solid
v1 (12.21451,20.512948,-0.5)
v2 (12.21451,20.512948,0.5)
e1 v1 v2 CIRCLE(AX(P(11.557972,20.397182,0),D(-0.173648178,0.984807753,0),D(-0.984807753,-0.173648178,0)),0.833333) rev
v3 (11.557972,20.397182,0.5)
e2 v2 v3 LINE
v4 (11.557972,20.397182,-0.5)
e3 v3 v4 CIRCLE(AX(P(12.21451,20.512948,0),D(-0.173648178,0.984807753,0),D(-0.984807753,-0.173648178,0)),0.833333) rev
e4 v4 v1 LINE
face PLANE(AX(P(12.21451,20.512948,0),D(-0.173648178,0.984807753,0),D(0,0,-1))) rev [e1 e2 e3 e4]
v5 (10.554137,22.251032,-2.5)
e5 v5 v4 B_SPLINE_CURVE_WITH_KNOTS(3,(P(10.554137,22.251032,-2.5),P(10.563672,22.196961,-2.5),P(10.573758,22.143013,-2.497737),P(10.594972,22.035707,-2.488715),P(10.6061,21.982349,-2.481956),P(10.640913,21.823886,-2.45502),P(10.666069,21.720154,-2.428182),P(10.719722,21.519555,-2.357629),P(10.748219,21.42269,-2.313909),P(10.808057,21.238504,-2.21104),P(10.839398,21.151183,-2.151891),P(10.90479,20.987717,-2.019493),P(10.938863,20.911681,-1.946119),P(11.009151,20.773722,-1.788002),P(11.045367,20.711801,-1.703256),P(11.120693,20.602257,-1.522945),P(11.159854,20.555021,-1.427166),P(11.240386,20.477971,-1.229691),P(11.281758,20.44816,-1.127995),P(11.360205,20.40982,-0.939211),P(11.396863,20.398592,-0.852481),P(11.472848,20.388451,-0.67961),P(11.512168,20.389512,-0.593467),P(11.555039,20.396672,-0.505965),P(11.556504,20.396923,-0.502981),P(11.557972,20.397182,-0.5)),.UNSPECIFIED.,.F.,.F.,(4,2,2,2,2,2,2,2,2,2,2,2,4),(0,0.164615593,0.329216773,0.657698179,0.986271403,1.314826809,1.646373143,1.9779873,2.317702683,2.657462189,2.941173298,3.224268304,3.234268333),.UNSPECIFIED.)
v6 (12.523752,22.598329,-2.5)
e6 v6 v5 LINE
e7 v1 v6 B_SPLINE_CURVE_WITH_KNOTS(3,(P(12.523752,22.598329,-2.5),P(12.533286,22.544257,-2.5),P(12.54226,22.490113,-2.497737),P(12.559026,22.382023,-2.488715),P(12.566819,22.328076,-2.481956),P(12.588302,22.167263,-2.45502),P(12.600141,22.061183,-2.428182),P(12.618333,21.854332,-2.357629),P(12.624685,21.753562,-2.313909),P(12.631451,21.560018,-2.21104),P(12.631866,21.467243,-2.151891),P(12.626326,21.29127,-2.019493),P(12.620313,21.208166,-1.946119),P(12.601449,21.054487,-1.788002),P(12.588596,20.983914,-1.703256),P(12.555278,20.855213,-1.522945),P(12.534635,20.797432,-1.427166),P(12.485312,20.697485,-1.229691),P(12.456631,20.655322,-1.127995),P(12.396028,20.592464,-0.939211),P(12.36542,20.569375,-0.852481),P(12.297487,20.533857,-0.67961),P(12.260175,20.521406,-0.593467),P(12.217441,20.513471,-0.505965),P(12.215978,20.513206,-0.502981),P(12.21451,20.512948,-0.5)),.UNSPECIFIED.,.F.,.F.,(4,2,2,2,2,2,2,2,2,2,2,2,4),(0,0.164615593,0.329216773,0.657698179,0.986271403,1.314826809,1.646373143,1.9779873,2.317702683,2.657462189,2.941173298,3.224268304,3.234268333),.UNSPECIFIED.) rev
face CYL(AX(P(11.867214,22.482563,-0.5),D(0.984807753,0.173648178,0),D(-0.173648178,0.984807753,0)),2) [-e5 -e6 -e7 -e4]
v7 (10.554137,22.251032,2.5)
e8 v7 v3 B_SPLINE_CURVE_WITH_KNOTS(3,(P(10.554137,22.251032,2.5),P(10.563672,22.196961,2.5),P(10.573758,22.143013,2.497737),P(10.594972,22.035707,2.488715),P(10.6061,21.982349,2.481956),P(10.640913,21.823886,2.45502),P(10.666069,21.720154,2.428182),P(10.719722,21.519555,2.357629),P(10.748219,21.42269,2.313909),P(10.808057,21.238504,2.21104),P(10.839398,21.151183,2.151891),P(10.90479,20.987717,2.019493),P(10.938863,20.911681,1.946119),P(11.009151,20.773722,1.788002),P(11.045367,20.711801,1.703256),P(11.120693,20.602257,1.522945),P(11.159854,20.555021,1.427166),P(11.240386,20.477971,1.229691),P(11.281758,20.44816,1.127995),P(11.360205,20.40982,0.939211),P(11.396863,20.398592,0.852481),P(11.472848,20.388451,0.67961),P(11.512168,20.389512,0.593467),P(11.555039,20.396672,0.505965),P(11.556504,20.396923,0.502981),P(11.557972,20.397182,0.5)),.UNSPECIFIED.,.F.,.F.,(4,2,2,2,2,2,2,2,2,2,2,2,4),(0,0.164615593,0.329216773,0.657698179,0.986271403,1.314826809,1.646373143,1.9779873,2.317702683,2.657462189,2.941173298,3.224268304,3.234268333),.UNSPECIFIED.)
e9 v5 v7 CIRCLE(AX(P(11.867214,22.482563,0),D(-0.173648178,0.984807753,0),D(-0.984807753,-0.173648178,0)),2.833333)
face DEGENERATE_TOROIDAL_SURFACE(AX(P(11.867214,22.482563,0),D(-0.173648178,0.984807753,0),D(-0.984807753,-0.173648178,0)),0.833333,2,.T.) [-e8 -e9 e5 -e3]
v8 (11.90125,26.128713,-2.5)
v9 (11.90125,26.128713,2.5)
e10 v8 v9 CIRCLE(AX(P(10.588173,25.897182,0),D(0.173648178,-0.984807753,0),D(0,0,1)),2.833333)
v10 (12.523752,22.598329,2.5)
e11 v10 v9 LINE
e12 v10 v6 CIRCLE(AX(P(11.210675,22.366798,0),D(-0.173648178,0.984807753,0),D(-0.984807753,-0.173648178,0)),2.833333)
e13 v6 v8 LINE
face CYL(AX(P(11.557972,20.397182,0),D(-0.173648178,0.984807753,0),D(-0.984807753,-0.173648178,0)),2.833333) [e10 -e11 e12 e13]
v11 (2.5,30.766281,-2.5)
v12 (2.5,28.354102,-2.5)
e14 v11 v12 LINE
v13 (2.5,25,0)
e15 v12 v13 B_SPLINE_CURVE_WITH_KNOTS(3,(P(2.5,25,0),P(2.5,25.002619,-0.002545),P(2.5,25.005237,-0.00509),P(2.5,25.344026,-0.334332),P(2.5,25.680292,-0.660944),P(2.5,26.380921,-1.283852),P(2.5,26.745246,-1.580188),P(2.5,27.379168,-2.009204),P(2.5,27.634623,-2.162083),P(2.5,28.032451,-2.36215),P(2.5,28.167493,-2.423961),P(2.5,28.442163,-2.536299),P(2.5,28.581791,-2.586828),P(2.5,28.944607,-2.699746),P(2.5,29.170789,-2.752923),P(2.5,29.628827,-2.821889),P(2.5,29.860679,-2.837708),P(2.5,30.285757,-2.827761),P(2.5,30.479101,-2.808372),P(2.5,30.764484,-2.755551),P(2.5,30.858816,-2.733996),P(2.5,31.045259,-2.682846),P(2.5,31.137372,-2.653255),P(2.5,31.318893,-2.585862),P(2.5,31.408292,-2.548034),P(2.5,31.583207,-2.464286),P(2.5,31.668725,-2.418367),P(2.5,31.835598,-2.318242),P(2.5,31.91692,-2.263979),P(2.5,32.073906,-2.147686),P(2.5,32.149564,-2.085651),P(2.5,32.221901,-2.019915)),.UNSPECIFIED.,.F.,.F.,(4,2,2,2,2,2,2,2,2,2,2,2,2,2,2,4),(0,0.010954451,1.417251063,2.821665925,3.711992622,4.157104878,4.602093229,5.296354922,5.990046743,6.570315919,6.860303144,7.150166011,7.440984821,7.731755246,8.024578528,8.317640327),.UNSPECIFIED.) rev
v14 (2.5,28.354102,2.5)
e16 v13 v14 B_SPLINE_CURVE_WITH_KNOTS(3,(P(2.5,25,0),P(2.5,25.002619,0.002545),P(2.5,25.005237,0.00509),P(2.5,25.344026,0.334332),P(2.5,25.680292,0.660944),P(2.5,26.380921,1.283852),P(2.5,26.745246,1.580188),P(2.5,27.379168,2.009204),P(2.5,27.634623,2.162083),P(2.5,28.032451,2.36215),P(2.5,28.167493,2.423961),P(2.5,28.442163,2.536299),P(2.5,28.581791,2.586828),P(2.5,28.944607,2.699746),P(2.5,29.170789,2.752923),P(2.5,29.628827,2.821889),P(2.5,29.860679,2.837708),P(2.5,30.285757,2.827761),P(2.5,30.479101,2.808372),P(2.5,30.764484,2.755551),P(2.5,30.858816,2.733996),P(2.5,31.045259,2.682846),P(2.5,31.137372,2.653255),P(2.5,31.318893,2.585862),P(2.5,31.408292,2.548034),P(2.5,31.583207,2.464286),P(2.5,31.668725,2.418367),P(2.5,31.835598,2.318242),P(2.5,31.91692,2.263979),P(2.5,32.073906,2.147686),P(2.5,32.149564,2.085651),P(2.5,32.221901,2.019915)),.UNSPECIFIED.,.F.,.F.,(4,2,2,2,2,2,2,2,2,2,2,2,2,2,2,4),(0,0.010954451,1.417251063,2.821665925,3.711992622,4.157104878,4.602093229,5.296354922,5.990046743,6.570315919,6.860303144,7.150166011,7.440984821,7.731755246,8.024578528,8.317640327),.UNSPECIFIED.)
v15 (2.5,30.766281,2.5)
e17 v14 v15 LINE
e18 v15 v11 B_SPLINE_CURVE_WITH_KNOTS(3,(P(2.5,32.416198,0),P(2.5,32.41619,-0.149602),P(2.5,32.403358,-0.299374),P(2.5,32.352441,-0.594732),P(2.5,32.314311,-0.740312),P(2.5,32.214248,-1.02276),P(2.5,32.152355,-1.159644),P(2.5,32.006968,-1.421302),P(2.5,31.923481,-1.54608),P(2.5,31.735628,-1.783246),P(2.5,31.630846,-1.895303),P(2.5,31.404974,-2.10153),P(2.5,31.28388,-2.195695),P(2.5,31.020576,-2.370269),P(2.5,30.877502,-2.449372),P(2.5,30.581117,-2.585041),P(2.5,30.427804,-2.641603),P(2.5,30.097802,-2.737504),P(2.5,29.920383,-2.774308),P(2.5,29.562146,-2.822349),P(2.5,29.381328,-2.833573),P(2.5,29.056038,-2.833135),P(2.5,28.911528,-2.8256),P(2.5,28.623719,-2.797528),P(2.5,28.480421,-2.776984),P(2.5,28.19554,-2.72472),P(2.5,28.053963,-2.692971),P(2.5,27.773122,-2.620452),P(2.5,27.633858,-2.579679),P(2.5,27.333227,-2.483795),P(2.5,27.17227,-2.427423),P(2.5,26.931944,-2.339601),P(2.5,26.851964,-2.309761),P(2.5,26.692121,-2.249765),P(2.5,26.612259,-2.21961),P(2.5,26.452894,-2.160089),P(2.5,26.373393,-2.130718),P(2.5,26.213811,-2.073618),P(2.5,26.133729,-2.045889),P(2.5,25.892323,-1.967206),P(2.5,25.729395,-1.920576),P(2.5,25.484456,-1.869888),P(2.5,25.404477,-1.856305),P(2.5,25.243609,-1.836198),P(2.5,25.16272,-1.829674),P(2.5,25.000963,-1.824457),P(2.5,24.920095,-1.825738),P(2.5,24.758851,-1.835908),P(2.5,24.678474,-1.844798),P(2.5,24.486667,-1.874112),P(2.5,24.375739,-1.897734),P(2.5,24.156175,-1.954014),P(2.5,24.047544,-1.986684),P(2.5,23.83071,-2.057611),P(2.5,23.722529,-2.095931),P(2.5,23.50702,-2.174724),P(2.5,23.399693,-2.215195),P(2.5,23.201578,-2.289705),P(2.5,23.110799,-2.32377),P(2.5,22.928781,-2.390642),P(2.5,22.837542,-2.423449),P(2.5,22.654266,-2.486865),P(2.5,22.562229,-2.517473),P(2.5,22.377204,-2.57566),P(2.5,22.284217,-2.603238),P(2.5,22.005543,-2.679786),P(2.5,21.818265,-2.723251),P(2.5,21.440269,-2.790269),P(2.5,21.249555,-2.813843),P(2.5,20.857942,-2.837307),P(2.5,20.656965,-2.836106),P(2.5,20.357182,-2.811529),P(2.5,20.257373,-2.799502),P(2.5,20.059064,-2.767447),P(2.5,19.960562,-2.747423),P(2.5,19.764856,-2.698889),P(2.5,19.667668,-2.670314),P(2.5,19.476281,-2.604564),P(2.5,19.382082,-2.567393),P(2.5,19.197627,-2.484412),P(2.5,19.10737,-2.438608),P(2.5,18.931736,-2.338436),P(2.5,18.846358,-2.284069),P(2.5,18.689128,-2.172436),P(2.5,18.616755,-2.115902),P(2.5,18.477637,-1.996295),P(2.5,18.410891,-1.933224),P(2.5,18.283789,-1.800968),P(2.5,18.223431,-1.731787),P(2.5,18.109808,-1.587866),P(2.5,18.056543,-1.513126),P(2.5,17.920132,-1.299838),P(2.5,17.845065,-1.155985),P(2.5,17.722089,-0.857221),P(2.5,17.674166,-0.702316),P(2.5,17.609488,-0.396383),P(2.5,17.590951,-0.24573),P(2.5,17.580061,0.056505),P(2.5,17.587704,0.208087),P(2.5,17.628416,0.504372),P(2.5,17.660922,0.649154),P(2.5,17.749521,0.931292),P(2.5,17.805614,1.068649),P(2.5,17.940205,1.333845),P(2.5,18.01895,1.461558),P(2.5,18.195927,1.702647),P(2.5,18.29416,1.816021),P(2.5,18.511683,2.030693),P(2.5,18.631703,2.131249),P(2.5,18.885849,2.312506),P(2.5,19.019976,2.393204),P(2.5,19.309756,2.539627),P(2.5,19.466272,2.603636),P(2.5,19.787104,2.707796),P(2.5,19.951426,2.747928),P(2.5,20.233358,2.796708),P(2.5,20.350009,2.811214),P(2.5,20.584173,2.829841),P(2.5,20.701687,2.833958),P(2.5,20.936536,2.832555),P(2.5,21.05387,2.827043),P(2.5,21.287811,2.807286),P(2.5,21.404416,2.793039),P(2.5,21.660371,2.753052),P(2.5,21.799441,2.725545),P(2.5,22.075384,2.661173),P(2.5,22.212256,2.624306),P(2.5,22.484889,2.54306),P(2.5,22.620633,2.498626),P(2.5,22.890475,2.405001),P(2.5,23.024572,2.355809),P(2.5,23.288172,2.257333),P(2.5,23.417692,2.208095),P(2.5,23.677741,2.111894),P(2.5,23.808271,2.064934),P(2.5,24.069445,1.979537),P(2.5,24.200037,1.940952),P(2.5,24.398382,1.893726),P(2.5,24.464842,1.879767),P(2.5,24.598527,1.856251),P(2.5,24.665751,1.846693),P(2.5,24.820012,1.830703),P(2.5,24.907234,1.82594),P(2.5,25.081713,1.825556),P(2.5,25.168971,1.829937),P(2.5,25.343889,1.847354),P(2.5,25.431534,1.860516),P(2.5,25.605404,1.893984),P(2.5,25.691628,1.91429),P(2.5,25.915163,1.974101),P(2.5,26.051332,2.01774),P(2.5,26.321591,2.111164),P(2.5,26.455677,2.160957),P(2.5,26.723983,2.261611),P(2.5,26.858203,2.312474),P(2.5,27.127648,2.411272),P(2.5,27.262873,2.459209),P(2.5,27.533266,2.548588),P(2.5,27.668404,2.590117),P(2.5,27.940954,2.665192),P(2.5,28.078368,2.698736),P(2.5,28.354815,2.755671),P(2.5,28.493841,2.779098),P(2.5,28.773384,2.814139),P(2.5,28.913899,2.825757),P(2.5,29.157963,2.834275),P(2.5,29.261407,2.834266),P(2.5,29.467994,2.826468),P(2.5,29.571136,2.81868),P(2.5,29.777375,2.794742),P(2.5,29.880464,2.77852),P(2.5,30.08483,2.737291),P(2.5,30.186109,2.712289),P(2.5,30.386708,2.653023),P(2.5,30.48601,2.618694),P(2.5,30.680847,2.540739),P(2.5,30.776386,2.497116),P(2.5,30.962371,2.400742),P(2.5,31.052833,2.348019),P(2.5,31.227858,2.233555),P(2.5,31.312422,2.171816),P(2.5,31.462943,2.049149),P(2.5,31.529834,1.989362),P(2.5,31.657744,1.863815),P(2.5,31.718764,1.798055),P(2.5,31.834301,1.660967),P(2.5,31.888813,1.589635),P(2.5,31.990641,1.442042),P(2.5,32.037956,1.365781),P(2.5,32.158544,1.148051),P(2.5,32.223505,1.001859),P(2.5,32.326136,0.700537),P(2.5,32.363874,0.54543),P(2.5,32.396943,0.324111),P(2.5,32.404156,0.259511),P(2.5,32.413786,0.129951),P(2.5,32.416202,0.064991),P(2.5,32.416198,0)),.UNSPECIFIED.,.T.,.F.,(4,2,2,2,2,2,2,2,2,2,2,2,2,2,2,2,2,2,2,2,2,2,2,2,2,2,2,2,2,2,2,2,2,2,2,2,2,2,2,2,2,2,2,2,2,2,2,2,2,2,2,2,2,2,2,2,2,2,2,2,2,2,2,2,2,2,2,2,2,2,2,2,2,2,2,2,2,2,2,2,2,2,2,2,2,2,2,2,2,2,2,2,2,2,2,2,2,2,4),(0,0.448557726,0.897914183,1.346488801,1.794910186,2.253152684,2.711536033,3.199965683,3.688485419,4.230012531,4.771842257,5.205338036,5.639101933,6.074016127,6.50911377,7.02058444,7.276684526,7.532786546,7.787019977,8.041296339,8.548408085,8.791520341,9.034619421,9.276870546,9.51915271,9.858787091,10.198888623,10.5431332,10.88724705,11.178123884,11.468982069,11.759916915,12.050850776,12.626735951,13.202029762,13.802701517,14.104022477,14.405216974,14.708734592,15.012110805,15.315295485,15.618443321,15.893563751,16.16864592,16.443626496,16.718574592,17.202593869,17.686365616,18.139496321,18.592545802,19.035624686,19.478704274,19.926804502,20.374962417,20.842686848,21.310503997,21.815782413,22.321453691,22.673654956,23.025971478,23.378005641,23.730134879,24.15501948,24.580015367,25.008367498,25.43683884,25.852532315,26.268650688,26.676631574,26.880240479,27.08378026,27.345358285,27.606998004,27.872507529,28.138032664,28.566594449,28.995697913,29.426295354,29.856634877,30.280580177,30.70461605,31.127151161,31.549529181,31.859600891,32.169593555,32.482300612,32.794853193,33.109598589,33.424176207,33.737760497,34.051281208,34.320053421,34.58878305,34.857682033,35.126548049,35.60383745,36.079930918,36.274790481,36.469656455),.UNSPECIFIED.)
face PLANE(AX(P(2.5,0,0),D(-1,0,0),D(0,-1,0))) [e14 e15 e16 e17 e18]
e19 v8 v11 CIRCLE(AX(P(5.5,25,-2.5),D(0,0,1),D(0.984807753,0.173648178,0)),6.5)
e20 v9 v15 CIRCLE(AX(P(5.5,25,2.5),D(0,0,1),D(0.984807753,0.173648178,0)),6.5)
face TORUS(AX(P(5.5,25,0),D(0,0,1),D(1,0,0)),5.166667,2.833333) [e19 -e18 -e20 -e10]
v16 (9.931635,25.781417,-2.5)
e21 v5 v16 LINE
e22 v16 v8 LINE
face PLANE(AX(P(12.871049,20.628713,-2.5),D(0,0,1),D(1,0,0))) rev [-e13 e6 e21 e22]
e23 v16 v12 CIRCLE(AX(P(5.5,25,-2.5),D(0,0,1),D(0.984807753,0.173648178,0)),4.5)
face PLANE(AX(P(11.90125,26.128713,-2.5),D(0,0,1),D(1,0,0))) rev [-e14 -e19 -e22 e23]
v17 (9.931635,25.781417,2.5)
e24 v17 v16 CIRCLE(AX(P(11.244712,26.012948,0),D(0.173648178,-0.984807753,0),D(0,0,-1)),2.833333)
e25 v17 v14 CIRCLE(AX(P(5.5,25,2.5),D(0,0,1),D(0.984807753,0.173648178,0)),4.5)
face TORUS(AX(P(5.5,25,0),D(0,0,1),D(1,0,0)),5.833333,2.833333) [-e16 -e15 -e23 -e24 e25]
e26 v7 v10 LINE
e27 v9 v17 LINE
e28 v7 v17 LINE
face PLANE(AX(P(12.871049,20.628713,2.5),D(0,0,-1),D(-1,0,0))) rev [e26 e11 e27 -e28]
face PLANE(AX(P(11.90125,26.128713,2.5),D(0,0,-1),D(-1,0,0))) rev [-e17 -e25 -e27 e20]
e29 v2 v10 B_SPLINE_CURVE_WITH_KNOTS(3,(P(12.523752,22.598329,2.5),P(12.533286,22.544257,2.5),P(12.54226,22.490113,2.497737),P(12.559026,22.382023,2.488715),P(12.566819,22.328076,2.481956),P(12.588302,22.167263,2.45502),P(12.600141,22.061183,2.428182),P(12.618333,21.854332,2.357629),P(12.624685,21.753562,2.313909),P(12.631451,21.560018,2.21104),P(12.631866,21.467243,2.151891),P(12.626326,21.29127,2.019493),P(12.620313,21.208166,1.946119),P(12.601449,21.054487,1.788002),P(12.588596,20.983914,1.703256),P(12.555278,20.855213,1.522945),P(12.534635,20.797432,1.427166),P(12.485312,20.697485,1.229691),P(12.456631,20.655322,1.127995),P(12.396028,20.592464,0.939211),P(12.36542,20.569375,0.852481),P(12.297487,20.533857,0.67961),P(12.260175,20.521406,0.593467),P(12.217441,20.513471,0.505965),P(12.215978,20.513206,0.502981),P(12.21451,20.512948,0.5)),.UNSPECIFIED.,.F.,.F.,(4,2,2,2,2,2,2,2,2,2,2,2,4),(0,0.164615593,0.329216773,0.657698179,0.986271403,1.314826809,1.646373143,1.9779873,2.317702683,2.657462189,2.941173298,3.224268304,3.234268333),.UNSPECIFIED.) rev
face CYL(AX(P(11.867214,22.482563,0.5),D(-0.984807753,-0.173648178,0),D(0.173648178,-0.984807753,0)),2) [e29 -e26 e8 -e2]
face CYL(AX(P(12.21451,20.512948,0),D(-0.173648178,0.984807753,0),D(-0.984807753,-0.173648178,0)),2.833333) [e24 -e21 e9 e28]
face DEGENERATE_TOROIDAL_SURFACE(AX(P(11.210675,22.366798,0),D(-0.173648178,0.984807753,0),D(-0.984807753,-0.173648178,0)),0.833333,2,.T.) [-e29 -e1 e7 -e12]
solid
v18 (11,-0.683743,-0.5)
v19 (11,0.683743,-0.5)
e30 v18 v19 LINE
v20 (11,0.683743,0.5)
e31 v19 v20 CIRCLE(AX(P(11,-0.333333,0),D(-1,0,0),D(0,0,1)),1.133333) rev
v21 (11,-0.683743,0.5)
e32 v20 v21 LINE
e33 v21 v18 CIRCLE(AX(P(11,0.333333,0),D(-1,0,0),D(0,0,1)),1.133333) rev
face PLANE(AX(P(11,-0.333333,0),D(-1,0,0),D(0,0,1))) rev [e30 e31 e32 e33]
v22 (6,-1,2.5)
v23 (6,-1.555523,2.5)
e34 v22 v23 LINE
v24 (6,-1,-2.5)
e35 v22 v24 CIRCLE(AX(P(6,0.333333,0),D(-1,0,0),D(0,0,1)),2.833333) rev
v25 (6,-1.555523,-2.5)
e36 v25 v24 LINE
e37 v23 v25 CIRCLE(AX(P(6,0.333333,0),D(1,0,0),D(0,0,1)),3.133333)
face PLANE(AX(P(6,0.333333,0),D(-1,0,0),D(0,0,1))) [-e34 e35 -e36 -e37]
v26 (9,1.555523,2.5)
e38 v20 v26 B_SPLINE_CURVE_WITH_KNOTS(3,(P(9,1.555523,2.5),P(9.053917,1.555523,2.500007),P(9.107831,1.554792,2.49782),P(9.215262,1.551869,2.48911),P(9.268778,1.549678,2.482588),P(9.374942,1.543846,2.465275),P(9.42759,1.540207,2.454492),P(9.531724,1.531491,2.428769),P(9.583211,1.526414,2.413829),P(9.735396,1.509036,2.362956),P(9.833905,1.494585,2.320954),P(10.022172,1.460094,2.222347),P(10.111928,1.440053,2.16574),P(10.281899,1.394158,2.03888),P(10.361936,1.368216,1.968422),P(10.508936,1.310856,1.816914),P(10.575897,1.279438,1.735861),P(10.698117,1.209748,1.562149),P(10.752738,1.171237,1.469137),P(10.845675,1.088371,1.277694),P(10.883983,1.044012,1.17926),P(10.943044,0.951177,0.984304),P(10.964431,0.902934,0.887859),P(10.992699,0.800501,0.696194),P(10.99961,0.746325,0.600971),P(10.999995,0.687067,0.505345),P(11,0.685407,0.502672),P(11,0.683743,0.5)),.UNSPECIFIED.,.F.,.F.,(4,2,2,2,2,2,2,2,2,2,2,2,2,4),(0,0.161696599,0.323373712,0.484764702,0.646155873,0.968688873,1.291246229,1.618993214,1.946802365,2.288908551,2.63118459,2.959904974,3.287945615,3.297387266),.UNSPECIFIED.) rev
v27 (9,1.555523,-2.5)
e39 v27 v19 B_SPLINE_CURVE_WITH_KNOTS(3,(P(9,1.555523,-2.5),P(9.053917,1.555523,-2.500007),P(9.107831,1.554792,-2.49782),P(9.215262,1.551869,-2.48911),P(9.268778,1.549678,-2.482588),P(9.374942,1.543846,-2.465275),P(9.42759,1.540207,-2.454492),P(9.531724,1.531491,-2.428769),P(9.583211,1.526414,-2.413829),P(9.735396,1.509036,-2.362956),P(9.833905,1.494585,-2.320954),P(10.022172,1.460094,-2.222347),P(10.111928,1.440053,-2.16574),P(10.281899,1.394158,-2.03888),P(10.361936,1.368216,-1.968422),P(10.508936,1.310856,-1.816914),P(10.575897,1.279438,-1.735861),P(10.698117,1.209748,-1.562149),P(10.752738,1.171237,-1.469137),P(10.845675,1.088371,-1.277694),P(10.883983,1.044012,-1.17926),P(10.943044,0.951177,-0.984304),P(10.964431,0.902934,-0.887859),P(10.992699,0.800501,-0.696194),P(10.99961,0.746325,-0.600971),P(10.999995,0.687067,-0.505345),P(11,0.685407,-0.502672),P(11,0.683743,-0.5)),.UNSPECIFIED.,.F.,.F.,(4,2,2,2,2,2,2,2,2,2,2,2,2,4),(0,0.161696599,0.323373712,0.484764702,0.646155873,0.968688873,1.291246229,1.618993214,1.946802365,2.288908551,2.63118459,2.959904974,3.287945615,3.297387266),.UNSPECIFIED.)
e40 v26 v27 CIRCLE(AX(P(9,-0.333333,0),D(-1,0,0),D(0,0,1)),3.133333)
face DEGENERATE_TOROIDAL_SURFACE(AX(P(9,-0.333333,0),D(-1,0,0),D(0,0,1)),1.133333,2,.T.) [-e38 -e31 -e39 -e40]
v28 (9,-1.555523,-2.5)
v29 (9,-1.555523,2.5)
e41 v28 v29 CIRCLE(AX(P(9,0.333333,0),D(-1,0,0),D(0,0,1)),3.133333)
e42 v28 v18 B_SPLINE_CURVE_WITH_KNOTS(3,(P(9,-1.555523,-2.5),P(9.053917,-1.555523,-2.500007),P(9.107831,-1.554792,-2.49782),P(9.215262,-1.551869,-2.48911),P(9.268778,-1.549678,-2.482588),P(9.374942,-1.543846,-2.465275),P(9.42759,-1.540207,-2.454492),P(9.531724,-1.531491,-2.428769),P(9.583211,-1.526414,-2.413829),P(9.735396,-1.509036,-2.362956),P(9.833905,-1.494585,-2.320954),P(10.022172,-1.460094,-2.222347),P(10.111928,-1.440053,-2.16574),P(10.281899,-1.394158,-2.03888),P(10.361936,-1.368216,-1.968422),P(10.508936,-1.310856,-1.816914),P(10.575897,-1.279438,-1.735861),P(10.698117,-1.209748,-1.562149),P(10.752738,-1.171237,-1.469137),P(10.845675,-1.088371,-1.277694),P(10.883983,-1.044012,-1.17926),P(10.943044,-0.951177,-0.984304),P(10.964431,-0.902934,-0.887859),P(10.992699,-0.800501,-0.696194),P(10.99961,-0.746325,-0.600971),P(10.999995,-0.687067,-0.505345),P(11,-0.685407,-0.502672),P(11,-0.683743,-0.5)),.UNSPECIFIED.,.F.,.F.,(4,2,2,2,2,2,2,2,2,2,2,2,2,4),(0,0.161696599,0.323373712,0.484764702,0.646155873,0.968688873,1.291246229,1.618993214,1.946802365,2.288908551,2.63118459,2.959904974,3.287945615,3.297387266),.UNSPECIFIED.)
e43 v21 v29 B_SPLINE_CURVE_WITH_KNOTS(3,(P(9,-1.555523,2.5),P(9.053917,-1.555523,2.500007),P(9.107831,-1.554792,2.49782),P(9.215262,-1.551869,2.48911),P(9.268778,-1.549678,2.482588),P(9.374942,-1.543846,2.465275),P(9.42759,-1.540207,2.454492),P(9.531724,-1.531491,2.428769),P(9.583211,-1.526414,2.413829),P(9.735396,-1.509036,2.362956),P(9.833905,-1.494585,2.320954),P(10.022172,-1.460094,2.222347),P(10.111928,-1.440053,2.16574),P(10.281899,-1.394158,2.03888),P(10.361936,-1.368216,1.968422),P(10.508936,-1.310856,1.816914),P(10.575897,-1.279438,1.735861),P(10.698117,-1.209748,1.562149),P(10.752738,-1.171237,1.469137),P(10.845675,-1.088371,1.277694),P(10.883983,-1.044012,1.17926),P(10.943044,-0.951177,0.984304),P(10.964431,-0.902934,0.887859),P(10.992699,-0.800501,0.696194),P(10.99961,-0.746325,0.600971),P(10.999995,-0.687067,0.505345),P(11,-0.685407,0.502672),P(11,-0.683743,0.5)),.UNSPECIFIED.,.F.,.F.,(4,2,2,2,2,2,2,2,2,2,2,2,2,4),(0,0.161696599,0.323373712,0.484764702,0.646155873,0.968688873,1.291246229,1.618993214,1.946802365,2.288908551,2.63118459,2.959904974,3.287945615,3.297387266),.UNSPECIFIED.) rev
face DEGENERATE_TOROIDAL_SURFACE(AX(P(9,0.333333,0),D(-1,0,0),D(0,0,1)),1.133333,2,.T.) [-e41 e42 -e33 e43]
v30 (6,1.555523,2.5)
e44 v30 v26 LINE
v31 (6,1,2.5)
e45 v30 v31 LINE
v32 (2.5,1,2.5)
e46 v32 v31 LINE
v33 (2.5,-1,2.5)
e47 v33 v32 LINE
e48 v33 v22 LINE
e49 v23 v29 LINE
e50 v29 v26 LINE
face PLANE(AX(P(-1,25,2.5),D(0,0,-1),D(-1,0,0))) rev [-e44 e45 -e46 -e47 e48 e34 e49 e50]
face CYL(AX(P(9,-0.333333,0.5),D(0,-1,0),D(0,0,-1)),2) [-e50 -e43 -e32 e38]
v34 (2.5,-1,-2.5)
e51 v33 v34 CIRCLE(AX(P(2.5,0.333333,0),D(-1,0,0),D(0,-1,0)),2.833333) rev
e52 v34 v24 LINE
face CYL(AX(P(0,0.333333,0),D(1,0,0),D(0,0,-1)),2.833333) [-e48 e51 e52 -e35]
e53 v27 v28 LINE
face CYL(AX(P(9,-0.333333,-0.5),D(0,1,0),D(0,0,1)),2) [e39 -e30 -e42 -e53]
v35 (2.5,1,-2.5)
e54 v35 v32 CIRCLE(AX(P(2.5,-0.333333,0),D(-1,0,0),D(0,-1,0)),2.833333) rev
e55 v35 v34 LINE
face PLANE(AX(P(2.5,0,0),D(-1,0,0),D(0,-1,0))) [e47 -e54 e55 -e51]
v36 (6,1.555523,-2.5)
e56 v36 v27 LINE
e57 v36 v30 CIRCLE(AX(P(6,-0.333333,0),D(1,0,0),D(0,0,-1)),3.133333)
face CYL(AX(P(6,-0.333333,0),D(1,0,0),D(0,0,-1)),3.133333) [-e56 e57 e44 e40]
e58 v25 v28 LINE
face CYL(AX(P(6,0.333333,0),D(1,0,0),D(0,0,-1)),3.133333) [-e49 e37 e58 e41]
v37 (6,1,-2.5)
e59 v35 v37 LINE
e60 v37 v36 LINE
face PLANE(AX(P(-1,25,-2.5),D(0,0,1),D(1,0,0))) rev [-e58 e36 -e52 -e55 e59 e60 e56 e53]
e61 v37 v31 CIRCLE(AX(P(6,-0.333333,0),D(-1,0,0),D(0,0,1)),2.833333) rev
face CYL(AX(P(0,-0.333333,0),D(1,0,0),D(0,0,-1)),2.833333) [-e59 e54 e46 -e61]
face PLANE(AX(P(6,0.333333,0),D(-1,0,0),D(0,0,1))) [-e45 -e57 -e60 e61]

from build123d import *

# Parameters (mm, degrees)
EXTRUDE_1_DEPTH     = 5
SKETCH_19_W         = 5
SKETCH_19_H         = 18
EXTRUDE_2_DEPTH     = 1.5
FILLET_2_R          = 2
SKETCH_20_W         = 13
SKETCH_20_H         = 40
CUT_EXTRUDE_1_DEPTH = 10


with BuildPart() as part:
    # 扫描2: sweep along a path in 草图1
    with BuildLine(Plane.XY) as sweep_2_path:
        Line((11.886241035, 20.455064977), (10.916442642, 25.955064977))
        ThreePointArc((10.916442642, 25.955064977), (5.020643415, 30.47907084), (0, 25))
        Line((0, 25), (0, 0))
        Line((0, 0), (0, -3))
    # 草图13 → 扫描2 (sweep)
    with BuildSketch(Plane(origin=(0, -3, 0), x_dir=(1, 0, 0), z_dir=(0, 1, 0))):
        with BuildLine():
            Line((-1, -2.5), (1, -2.5))
            ThreePointArc((1, -2.5), (2.5, 0), (1, 2.5))
            Line((1, 2.5), (-1, 2.5))
            ThreePointArc((-1, 2.5), (-2.5, 0), (-1, -2.5))
        make_face()
    sweep(path=sweep_2_path.line)

    # 扫描4: sweep along a path in 草图15
    with BuildLine(Plane.XY) as sweep_4_path:
        Line((0, 0), (11, 0))
    # 草图16 → 扫描4 (sweep)
    with BuildSketch(Plane(origin=(11, 0, 0), x_dir=(0, 0, -1), z_dir=(1, 0, 0))):
        with BuildLine():
            Line((-2.5, -1), (-2.5, 1))
            ThreePointArc((-2.5, 1), (0, 2.5), (2.5, 1))
            Line((2.5, 1), (2.5, -1))
            ThreePointArc((2.5, -1), (0, -2.5), (-2.5, -1))
        make_face()
    sweep(path=sweep_4_path.line)

    # 草图17 → 凸台-拉伸1 (add)
    with BuildSketch(Plane(origin=(11, 0, 0), x_dir=(0, 0, -1), z_dir=(1, 0, 0))):
        with BuildLine():
            Line((-2.5, 1.555522876), (-2.5, -1.555522876))
            ThreePointArc((-2.5, -1.555522876), (0, -2.8), (2.5, -1.555522876))
            Line((2.5, -1.555522876), (2.5, 1.555522876))
            ThreePointArc((2.5, 1.555522876), (0, 2.8), (-2.5, 1.555522876))
        make_face()
    extrude(amount=-EXTRUDE_1_DEPTH)

    # 草图19 → 凸台-拉伸2 (add)
    with BuildSketch(Plane(origin=(1, 0, 0), x_dir=(0, 0, -1), z_dir=(1, 0, 0))):
        with Locations((0, 14)):
            Rectangle(SKETCH_19_W, SKETCH_19_H)
    extrude(amount=EXTRUDE_2_DEPTH)

    # 圆角2
    # the kernel refuses this fillet: 2 mm, written as the material it takes off along each edge
    with BuildSketch(Plane(origin=(17.795087554, 21.496954043, 2.5), x_dir=(0, 0, -1), z_dir=(-0.9848077530122092, -0.17364817766692353, 0))) as fillet_2_piece_1:
        with BuildLine():
            CenterArc((FILLET_2_R, -FILLET_2_R), FILLET_2_R, 90, 90)
            Line((0, -FILLET_2_R), (0, 0))
            Line((0, 0), (FILLET_2_R, 0))
        make_face()
    extrude(amount=12, mode=Mode.SUBTRACT)
    with BuildSketch(Plane(origin=(12.214510286, 20.512947703, 0), x_dir=(0.9423506208781961, 0.16616183974819207, -0.2904574845686963), z_dir=(0.2860447827236763, 0.050437412885072544, 0.9568878981667737))) as fillet_2_piece_2:
        with BuildLine():
            CenterArc((2.833333333 - FILLET_2_R, FILLET_2_R), FILLET_2_R, 270, 90)
            Line((2.833333333 - FILLET_2_R, 0), (2.833333333, 0))
            Line((2.833333333, 0), (2.833333333, FILLET_2_R))
        make_face()
    revolve(axis=Axis((12.214510286, 20.512947703, 0), (-0.17364817766692303, 0.9848077530122095, 0)), revolution_arc=326.229306127, mode=Mode.SUBTRACT)
    with BuildSketch(Plane(origin=(5.977394517, 19.413175911, -2.5), x_dir=(-0.17364817766692353, 0.9848077530122094, 0), z_dir=(0.9848077530122092, 0.17364817766692353, 0))) as fillet_2_piece_3:
        with BuildLine():
            CenterArc((FILLET_2_R, FILLET_2_R), FILLET_2_R, 180, 90)
            Line((0, FILLET_2_R), (0, 0))
            Line((0, 0), (FILLET_2_R, 0))
        make_face()
    extrude(amount=12, mode=Mode.SUBTRACT)
    with BuildSketch(Plane(origin=(11, -6.555522876, 2.5), x_dir=(0, 0, -1), z_dir=(0, 1, 0))) as fillet_2_piece_4:
        with BuildLine():
            CenterArc((FILLET_2_R, FILLET_2_R), FILLET_2_R, 180, 90)
            Line((0, FILLET_2_R), (0, 0))
            Line((0, 0), (FILLET_2_R, 0))
        make_face()
    extrude(amount=13.111045751, mode=Mode.SUBTRACT)
    with BuildSketch(Plane(origin=(11, 6.555522876, -2.5), x_dir=(-1, 0, 0), z_dir=(0, -1, 0))) as fillet_2_piece_5:
        with BuildLine():
            CenterArc((FILLET_2_R, -FILLET_2_R), FILLET_2_R, 90, 90)
            Line((0, -FILLET_2_R), (0, 0))
            Line((0, 0), (FILLET_2_R, 0))
        make_face()
    extrude(amount=13.111045751, mode=Mode.SUBTRACT)
    with BuildSketch(Plane(origin=(11, -0.333333333, 0), x_dir=(0, -0.8131785022115455, -0.582014367125922), z_dir=(0, -0.582014367125922, 0.8131785022115455))) as fillet_2_piece_6:
        with BuildLine():
            CenterArc((3.133333333 - FILLET_2_R, -FILLET_2_R), FILLET_2_R, 0, 90)
            Line((3.133333333, -FILLET_2_R), (3.133333333, 0))
            Line((3.133333333, 0), (3.133333333 - FILLET_2_R, 0))
        make_face()
    revolve(axis=Axis((11, -0.333333333, 0), (1, 0, 0)), revolution_arc=288.815304863, mode=Mode.SUBTRACT)
    with BuildSketch(Plane(origin=(11, 0.333333333, 0), x_dir=(0, 0.8131785022115376, 0.5820143671259329), z_dir=(0, 0.5820143671259329, -0.8131785022115376))) as fillet_2_piece_7:
        with BuildLine():
            CenterArc((3.133333333 - FILLET_2_R, -FILLET_2_R), FILLET_2_R, 0, 90)
            Line((3.133333333 - FILLET_2_R, 0), (3.133333333, 0))
            Line((3.133333333, 0), (3.133333333, -FILLET_2_R))
        make_face()
    revolve(axis=Axis((11, 0.333333333, 0), (1, 0, 0)), revolution_arc=288.815304863, mode=Mode.SUBTRACT)
    with BuildSketch(Plane(origin=(11.557971784, 20.397182251, 0), x_dir=(-0.9423506208781962, -0.1661618397481921, 0.2904574845686961), z_dir=(-0.2860447827236761, -0.050437412885072516, -0.9568878981667738))) as fillet_2_piece_8:
        with BuildLine():
            CenterArc((2.833333333 - FILLET_2_R, FILLET_2_R), FILLET_2_R, 270, 90)
            Line((2.833333333, FILLET_2_R), (2.833333333, 0))
            Line((2.833333333, 0), (2.833333333 - FILLET_2_R, 0))
        make_face()
    revolve(axis=Axis((11.557971784, 20.397182251, 0), (-0.17364817766692306, 0.9848077530122095, 0)), revolution_arc=326.229306127, mode=Mode.SUBTRACT)

    # 草图20 → 切除-拉伸1 (cut)
    with BuildSketch(Plane(origin=(2.5, 0, 0), x_dir=(0, 0, -1), z_dir=(1, 0, 0))):
        with Locations((0, 14)):
            Rectangle(SKETCH_20_W, SKETCH_20_H)
    extrude(amount=-CUT_EXTRUDE_1_DEPTH, mode=Mode.SUBTRACT)


with BuildPart() as cut_extrude_1_piece_1:
    # of the separate pieces the step leaves, piece 1, a body of its own (cut_extrude_1_pieces)
    add(part.part.solids().sort_by_distance((10.554136927, 22.251032306, -2.5))[0])


with BuildPart() as cut_extrude_1_piece_2:
    # of the separate pieces the step leaves, piece 2, a body of its own (cut_extrude_1_pieces)
    add(part.part.solids().sort_by_distance((2.5, -1, -2.5))[0])


solid = Compound([cut_extrude_1_piece_1.part, cut_extrude_1_piece_2.part])
